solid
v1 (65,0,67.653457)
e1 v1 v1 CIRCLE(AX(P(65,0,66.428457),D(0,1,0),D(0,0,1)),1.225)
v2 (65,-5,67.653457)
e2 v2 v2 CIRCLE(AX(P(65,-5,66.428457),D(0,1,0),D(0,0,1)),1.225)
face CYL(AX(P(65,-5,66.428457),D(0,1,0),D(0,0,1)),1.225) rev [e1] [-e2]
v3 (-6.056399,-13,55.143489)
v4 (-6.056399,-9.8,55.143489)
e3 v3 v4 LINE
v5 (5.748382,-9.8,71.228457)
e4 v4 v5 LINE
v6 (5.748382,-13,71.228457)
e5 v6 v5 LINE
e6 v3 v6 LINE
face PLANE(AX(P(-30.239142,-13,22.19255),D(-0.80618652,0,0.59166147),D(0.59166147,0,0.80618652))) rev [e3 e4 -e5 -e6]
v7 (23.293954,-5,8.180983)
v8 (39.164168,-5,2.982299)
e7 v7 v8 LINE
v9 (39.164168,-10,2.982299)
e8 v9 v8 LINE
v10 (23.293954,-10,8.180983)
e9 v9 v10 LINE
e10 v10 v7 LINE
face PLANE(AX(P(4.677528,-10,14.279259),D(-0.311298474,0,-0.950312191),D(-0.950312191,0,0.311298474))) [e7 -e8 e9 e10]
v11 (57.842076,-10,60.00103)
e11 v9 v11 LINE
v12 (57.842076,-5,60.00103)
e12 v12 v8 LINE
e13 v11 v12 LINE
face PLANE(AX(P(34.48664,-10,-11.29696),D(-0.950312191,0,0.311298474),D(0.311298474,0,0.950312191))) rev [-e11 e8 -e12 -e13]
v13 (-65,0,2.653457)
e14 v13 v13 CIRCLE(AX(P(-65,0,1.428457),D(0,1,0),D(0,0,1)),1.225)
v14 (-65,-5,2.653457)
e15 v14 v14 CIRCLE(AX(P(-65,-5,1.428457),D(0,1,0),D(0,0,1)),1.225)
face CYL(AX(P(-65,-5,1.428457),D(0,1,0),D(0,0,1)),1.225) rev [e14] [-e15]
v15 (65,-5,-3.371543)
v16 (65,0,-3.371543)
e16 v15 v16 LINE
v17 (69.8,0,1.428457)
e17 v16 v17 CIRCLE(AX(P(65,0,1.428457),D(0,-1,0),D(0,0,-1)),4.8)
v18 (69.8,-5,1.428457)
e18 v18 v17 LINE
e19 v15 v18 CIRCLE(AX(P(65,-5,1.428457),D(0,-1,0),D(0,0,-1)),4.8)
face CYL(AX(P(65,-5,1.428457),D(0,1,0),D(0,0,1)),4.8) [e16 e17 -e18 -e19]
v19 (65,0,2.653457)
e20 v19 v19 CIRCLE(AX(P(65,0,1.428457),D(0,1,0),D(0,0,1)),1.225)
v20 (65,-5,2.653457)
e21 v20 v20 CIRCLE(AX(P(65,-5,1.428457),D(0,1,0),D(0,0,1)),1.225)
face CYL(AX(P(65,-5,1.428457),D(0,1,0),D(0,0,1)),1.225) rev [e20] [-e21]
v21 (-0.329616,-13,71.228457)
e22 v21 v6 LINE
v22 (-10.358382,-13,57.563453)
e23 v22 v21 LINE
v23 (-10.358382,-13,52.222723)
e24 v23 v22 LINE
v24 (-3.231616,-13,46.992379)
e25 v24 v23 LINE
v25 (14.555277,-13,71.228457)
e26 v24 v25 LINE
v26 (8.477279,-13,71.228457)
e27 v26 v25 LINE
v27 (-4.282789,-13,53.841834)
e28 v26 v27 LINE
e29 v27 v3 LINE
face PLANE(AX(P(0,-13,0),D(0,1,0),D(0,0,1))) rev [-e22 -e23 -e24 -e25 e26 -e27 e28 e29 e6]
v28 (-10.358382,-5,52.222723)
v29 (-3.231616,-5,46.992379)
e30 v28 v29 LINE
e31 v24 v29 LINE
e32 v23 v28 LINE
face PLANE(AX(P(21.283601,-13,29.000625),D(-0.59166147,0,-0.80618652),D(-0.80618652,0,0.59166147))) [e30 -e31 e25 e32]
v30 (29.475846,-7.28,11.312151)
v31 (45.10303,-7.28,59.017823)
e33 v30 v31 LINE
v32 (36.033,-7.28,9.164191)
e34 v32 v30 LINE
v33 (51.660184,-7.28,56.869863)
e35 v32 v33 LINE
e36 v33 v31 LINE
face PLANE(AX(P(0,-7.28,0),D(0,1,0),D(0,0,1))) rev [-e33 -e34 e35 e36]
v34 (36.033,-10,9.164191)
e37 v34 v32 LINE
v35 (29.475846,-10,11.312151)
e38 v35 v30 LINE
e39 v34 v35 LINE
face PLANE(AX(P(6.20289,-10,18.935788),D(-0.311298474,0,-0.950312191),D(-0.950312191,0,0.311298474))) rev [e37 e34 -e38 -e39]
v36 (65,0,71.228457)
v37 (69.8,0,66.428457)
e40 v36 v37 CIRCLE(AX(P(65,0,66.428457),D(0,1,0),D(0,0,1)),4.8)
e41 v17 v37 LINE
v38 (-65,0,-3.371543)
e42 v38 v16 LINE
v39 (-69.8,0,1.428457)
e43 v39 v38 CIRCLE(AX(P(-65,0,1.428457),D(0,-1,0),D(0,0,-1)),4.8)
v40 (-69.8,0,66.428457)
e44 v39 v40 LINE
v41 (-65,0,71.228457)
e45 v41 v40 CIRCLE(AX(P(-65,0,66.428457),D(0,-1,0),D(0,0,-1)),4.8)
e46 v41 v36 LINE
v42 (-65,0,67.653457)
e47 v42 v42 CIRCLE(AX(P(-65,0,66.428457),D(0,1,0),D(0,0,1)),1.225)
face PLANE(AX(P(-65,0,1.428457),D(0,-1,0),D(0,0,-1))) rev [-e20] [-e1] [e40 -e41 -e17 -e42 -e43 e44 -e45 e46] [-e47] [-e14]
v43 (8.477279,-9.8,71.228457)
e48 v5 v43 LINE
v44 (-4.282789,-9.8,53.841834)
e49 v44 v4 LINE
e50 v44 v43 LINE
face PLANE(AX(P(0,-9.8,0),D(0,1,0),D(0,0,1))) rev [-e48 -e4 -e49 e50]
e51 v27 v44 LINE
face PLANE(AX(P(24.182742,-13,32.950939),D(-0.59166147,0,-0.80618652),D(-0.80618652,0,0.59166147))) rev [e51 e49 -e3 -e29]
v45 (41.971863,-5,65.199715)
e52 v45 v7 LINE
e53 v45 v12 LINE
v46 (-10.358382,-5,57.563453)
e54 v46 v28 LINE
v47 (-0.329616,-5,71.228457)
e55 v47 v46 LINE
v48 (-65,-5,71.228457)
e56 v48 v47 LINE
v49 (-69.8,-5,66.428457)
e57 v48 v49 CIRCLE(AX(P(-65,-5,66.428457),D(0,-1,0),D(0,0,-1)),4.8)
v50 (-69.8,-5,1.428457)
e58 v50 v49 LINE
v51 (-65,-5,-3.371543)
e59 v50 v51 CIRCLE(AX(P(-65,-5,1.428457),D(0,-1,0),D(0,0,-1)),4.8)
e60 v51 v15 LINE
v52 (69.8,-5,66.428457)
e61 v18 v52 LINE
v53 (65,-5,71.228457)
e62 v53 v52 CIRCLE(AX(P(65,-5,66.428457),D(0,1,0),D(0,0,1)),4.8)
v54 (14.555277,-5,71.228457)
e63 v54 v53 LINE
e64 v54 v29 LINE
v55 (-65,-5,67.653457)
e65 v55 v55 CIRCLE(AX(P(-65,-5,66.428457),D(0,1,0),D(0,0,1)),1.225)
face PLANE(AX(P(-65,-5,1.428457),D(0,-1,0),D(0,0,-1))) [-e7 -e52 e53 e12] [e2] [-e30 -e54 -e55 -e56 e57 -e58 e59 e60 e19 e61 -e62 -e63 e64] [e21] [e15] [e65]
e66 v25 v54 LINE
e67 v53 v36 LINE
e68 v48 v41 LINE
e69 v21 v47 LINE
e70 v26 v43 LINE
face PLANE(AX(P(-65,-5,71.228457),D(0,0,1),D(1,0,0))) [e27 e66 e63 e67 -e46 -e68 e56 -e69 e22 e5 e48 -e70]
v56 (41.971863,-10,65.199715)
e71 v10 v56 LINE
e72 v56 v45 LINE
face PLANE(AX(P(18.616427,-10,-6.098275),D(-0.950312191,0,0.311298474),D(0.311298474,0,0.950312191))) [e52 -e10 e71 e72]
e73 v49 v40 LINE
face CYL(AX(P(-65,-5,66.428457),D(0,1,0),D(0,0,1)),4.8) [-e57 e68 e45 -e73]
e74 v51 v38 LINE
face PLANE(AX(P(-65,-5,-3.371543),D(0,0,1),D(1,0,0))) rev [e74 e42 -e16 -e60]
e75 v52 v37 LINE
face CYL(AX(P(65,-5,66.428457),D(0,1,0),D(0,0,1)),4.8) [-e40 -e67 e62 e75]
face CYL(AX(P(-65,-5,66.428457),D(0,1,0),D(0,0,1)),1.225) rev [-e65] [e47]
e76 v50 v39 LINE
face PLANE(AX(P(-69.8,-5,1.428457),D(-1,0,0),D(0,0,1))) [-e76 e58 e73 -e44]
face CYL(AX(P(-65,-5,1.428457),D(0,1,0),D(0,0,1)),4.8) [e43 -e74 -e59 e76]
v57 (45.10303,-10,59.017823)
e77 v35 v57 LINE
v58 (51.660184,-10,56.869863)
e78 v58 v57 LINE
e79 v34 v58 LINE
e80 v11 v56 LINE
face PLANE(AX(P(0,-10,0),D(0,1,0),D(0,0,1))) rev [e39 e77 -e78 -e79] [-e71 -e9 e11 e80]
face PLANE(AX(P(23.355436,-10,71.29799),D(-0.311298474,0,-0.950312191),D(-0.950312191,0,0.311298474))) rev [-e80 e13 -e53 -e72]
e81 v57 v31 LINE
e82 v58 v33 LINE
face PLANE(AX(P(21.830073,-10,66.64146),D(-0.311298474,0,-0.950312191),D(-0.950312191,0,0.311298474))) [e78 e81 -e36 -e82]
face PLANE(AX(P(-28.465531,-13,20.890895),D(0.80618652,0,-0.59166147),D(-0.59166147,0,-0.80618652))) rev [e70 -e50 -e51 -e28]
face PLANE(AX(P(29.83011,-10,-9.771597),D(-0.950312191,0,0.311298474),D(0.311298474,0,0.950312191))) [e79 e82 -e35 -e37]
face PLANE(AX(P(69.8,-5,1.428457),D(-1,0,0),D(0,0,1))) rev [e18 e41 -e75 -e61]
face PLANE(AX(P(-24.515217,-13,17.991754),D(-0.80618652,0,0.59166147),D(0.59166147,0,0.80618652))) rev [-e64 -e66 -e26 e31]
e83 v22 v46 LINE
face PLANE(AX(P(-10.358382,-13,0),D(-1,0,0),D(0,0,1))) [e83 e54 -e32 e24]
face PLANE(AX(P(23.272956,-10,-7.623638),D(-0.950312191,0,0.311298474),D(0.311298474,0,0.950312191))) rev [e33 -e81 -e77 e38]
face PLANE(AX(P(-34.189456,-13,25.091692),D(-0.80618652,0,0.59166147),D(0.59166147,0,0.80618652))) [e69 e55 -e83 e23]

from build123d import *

# Parameters (mm, degrees)
EXTRUDE_1_DEPTH     = 5
EXTRUDE_2_DEPTH     = 13
EXTRUDE_3_DEPTH     = 10
EXTRUDE_4_DEPTH     = 7.28
EXTRUDE_5_DEPTH     = 9.8
SKETCH_2_23_R       = 1.225
CUT_EXTRUDE_1_DEPTH = 5


with BuildPart() as part:
    # 草图2 → 凸台-拉伸1 (new body)
    with BuildSketch(Plane(origin=(0, 0, 0), x_dir=(1, 0, 0), z_dir=(0, 1, 0))):
        with BuildLine():
            Line((69.8, -1.428456646), (69.8, -66.428456646))
            ThreePointArc((69.8, -66.428456646), (68.39411255, -69.822569196), (65, -71.228456646))
            Line((65, -71.228456646), (-65, -71.228456646))
            ThreePointArc((-65, -71.228456646), (-68.39411255, -69.822569196), (-69.8, -66.428456646))
            Line((-69.8, -66.428456646), (-69.8, -1.428456646))
            ThreePointArc((-69.8, -1.428456646), (-68.39411255, 1.965655904), (-65, 3.371543354))
            Line((-65, 3.371543354), (65, 3.371543354))
            ThreePointArc((65, 3.371543354), (68.39411255, 1.965655904), (69.8, -1.428456646))
        make_face()
    extrude(amount=-EXTRUDE_1_DEPTH)

    # 草图2<19> → 凸台-拉伸2 (add)
    with BuildSketch(Plane(origin=(0, 0, 0), x_dir=(1, 0, 0), z_dir=(0, 1, 0))):
        Polygon((14.518227689, -71.177974158), (-3.231616409, -46.992378558), (-10.358382401, -52.222722576), (-10.358382401, -57.563452802), (-0.32961603, -71.228456646), (5.748381901, -71.228456646), (-6.056399498, -55.143488942), (-4.282789154, -53.841833708), (7.668772538, -70.126801412), (8.477278931, -71.228456646), (14.555276861, -71.228456646), align=None)
    extrude(amount=-EXTRUDE_2_DEPTH)

    # 草图2<20> → 凸台-拉伸3 (add)
    with BuildSketch(Plane(origin=(0, 0, 0), x_dir=(1, 0, 0), z_dir=(0, 1, 0))):
        Polygon((57.842076132, -60.001030407), (39.164167684, -2.982298959), (23.293954098, -8.180983477), (41.971862546, -65.199714925), align=None)
        Polygon((29.475846356, -11.312150688), (36.033000472, -9.164191217), (51.660183874, -56.869863196), (45.103029757, -59.017822667), align=None, mode=Mode.SUBTRACT)
    extrude(amount=-EXTRUDE_3_DEPTH)

    # 草图2<21> → 凸台-拉伸4 (add)
    with BuildSketch(Plane(origin=(0, 0, 0), x_dir=(1, 0, 0), z_dir=(0, 1, 0))):
        Polygon((51.660183874, -56.869863196), (36.033000472, -9.164191217), (29.475846356, -11.312150688), (45.103029757, -59.017822667), align=None)
    extrude(amount=-EXTRUDE_4_DEPTH)

    # 草图2<22> → 凸台-拉伸5 (add)
    with BuildSketch(Plane(origin=(0, 0, 0), x_dir=(1, 0, 0), z_dir=(0, 1, 0))):
        Polygon((5.748381901, -71.228456646), (8.477278931, -71.228456646), (7.668772538, -70.126801412), (-4.282789154, -53.841833708), (-6.056399498, -55.143488942), align=None)
    extrude(amount=-EXTRUDE_5_DEPTH)

    # 草图2<23> → 切除-拉伸1 (cut)
    with BuildSketch(Plane(origin=(0, 0, 0), x_dir=(1, 0, 0), z_dir=(0, 1, 0))):
        with Locations((-65, -1.428456646)):
            Circle(SKETCH_2_23_R)
        with Locations((-65, -66.428456646)):
            Circle(SKETCH_2_23_R)
        with Locations((65, -66.428456646)):
            Circle(SKETCH_2_23_R)
        with Locations((65, -1.428456646)):
            Circle(SKETCH_2_23_R)
    extrude(amount=-CUT_EXTRUDE_1_DEPTH, mode=Mode.SUBTRACT)


solid = part.part
